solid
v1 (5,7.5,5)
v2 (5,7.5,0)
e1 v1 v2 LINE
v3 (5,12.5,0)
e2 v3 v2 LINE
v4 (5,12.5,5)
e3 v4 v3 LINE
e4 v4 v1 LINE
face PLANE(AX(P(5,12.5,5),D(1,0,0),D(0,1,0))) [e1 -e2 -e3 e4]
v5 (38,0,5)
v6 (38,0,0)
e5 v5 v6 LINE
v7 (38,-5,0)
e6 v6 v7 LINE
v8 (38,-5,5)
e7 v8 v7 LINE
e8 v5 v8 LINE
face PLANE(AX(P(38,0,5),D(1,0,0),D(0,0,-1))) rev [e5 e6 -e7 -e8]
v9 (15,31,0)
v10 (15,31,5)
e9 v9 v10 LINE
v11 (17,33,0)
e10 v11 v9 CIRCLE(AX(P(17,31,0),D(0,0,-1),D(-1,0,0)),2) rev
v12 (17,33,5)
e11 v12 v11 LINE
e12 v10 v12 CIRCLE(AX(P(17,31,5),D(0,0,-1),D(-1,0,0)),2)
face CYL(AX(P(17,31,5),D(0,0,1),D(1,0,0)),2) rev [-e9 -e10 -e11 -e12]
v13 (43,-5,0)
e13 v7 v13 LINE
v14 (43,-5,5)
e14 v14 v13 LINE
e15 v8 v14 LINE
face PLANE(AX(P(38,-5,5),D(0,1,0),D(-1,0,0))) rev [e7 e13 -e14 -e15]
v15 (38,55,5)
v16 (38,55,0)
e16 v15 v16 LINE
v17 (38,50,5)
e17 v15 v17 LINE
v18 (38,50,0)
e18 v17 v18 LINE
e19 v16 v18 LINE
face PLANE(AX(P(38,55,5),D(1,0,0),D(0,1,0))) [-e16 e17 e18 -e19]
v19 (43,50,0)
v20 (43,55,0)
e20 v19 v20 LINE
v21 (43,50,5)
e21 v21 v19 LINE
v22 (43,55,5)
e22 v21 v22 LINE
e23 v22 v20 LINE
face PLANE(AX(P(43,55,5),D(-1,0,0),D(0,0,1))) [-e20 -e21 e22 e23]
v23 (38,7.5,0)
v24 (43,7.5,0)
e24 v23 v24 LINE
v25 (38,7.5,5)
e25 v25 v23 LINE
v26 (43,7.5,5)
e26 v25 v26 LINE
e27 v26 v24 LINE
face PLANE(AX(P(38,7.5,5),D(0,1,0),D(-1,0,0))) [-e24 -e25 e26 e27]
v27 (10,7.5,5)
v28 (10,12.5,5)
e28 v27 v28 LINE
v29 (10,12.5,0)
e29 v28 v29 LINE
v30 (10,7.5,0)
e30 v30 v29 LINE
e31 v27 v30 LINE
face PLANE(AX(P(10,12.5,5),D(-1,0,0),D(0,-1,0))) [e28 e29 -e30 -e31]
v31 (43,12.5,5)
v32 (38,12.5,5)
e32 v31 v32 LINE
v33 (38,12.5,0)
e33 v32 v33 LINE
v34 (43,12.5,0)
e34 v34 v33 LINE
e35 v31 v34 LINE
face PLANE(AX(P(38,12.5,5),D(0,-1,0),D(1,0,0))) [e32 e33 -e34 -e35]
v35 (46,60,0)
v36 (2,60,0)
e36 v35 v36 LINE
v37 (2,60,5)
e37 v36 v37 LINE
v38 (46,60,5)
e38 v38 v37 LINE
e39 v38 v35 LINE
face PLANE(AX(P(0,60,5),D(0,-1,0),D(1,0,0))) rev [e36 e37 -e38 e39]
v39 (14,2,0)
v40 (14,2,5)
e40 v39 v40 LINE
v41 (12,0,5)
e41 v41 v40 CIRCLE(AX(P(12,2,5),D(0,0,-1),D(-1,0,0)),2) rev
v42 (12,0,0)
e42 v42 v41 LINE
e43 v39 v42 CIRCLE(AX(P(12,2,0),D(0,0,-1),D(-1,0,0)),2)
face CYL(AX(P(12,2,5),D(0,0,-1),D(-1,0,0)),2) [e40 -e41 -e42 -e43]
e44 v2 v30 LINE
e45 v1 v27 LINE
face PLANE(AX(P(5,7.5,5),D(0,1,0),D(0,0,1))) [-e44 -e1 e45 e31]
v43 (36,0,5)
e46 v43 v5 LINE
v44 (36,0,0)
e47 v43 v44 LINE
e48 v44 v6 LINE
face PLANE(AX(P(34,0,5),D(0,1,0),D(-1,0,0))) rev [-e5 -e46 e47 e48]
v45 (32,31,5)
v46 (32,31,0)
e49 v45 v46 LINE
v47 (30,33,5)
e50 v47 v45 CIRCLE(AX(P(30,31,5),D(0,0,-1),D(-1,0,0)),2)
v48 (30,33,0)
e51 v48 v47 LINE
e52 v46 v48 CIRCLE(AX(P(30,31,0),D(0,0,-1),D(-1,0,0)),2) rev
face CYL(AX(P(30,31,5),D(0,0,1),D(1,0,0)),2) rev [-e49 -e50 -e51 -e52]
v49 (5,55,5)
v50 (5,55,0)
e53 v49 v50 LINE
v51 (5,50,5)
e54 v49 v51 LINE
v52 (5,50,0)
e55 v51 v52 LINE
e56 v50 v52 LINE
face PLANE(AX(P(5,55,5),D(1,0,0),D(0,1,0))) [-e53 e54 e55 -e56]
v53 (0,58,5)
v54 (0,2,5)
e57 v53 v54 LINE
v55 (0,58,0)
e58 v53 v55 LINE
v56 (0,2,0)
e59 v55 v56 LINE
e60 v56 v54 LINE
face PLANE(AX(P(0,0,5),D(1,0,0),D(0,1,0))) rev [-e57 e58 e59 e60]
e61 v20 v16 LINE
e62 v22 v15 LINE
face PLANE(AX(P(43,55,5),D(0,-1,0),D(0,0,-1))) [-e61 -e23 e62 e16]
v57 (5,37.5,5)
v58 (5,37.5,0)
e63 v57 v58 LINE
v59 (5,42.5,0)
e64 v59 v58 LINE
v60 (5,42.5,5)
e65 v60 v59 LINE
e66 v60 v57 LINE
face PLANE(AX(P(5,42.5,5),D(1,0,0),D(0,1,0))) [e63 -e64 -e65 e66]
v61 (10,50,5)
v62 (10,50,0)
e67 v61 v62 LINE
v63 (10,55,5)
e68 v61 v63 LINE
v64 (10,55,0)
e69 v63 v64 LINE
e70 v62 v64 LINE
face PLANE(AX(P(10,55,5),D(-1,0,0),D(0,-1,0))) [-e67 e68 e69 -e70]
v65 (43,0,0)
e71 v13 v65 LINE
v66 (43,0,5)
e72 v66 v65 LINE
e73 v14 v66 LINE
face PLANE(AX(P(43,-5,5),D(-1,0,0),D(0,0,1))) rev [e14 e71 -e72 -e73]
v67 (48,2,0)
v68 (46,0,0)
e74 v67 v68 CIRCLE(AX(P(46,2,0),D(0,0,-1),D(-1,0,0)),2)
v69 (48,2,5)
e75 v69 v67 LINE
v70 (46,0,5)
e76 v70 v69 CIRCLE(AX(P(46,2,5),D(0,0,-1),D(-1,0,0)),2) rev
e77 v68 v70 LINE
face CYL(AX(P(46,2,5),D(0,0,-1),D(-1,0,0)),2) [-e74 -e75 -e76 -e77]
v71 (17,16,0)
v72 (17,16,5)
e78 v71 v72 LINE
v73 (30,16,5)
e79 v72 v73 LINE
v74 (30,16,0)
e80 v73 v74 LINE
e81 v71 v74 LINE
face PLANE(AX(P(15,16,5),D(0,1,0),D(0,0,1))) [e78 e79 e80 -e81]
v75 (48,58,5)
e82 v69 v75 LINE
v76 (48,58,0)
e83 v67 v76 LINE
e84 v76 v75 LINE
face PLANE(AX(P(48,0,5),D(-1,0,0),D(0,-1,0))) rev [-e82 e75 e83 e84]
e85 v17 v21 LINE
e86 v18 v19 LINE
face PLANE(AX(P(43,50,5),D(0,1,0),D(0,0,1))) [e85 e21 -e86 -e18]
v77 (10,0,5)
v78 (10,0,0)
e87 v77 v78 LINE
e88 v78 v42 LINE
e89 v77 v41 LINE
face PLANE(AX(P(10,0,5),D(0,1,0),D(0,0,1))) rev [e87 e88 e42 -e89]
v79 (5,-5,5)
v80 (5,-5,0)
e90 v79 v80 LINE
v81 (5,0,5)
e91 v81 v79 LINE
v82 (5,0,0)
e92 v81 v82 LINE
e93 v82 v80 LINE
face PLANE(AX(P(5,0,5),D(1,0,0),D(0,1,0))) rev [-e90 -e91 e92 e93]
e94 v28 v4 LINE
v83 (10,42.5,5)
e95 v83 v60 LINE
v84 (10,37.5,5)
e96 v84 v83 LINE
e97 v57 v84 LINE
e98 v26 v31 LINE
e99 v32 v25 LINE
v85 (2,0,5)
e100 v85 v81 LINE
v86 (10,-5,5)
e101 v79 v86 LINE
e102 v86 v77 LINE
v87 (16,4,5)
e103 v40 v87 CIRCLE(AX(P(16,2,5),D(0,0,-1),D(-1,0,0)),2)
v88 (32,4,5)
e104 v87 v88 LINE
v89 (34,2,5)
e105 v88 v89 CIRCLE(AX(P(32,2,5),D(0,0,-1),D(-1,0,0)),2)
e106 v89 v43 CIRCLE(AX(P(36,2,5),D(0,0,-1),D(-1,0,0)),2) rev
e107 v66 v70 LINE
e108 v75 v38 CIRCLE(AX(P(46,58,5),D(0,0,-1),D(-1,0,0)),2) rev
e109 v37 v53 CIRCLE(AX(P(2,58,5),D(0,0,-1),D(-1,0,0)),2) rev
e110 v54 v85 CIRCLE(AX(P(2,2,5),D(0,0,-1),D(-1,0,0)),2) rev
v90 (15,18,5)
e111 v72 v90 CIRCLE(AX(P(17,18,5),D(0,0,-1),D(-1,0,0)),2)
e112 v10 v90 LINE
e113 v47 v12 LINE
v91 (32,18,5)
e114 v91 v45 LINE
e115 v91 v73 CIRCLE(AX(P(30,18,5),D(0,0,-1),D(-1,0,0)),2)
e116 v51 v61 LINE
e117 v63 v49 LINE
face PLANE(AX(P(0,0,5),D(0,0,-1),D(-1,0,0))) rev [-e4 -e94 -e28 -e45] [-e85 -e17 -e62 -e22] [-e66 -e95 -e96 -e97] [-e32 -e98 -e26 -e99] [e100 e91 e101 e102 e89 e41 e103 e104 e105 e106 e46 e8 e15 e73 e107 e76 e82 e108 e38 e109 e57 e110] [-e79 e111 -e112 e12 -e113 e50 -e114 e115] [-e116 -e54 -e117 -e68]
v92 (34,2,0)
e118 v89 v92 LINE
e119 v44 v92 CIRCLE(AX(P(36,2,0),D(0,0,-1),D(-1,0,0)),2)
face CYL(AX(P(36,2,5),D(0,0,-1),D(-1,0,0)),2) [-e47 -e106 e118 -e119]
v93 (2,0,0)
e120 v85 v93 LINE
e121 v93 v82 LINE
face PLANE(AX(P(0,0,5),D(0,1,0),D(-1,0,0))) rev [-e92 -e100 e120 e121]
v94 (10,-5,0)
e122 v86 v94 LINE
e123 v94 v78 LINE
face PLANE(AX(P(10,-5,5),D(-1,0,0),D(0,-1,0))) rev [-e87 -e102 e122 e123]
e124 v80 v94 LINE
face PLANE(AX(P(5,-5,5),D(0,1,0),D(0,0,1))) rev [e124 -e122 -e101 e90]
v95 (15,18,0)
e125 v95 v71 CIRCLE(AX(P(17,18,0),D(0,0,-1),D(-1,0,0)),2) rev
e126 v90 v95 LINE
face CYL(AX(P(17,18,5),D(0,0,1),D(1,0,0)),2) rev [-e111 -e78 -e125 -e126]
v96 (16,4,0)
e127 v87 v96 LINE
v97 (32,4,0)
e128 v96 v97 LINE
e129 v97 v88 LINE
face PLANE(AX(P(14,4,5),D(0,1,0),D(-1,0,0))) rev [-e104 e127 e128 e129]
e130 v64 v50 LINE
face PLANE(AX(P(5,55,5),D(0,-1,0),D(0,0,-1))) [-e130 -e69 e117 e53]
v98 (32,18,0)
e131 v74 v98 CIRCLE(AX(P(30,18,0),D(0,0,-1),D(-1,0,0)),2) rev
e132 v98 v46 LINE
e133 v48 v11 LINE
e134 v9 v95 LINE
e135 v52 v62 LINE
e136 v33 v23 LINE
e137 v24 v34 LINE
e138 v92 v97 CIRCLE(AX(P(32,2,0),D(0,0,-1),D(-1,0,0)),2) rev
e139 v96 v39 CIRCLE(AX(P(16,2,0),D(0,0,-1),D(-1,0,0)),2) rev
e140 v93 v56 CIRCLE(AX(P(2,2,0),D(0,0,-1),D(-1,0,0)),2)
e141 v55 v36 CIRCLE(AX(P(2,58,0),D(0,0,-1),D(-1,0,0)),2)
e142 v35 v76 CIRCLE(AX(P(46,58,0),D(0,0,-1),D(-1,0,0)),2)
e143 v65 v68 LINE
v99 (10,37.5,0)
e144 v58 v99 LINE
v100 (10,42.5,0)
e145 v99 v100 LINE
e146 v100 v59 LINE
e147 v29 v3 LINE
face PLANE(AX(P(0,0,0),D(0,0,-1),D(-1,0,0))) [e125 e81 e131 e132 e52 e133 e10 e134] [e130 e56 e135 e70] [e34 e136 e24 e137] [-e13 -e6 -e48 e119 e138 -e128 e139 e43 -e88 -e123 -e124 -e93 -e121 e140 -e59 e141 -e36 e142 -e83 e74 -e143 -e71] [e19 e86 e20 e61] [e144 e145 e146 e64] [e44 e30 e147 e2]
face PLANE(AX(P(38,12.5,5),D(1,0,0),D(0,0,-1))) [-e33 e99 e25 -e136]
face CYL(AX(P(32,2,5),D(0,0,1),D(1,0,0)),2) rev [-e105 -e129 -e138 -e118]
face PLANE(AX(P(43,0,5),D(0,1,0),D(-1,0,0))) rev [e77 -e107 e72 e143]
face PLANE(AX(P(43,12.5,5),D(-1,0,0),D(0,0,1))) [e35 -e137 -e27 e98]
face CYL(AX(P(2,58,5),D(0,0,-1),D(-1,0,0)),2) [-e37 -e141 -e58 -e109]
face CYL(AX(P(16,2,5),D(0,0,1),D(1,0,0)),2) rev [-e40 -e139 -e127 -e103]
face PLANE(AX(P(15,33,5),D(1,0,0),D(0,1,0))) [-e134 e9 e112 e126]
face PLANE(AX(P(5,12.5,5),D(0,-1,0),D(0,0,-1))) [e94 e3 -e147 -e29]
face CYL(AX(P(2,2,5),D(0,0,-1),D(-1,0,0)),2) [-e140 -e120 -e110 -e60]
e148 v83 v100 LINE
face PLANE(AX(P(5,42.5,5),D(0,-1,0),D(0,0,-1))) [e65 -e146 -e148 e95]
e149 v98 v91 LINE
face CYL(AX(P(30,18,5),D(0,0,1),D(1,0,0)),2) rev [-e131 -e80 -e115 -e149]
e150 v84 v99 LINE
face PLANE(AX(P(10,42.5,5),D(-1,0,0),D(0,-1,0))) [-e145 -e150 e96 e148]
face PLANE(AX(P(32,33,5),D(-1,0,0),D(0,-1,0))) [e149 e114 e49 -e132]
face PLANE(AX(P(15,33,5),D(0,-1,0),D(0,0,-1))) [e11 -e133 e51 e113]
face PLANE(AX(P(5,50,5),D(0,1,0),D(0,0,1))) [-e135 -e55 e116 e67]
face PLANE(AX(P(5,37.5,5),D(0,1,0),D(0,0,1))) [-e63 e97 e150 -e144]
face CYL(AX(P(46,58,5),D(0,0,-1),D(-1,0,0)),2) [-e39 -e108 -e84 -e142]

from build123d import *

# Parameters (mm, degrees)
ESQUISSE1_W        = 5
ESQUISSE1_H        = 5
ESQUISSE1_W_2      = 17
ESQUISSE1_H_2      = 17
BOSS_EXTRU_1_DEPTH = 5
CONG_1_START       = -1
CONG_1_DEPTH       = 7
CONG_1_2_DEPTH     = 5


with BuildPart() as part:
    # Esquisse1 → Boss.-Extru.1 (new body)
    with BuildSketch(Plane.XY):
        Polygon((0, 0), (5, 0), (5, -5), (10, -5), (10, 0), (14, 0), (14, 4), (34, 4), (34, 0), (38, 0), (38, -5), (43, -5), (43, 0), (48, 0), (48, 60), (0, 60), align=None)
        with Locations((7.5, 10)):
            Rectangle(ESQUISSE1_W, ESQUISSE1_H, mode=Mode.SUBTRACT)
        with Locations((7.5, 40)):
            Rectangle(ESQUISSE1_W, ESQUISSE1_H, mode=Mode.SUBTRACT)
        with Locations((40.5, 10)):
            Rectangle(ESQUISSE1_W, ESQUISSE1_H, mode=Mode.SUBTRACT)
        with Locations((40.5, 52.5)):
            Rectangle(ESQUISSE1_W, ESQUISSE1_H, mode=Mode.SUBTRACT)
        with Locations((7.5, 52.5)):
            Rectangle(ESQUISSE1_W, ESQUISSE1_H, mode=Mode.SUBTRACT)
        with Locations((23.5, 24.5)):
            Rectangle(ESQUISSE1_W_2, ESQUISSE1_H_2, mode=Mode.SUBTRACT)
    extrude(amount=BOSS_EXTRU_1_DEPTH)

    # Congé1: read off the stored shape, not the designer's step
    # Congé1 outline → Congé1 (cut)
    with BuildSketch(Plane.XY.offset(CONG_1_START)):
        with BuildLine():
            Line((14, 0), (14, 2))
            ThreePointArc((14, 2), (13.414213562, 0.585786438), (12, 0))
            Line((12, 0), (14, 0))
        make_face()
        with BuildLine():
            ThreePointArc((36, 0), (34.585786438, 0.585786438), (34, 2))
            Line((34, 2), (34, 0))
            Line((34, 0), (36, 0))
        make_face()
        with BuildLine():
            Line((48, 0), (48, 2))
            ThreePointArc((48, 2), (47.414213562, 0.585786438), (46, 0))
            Line((46, 0), (48, 0))
        make_face()
        with BuildLine():
            ThreePointArc((2, 0), (0.585786438, 0.585786438), (0, 2))
            Line((0, 2), (0, 0))
            Line((0, 0), (2, 0))
        make_face()
        with BuildLine():
            ThreePointArc((0, 58), (0.585786438, 59.414213562), (2, 60))
            Line((2, 60), (0, 60))
            Line((0, 60), (0, 58))
        make_face()
        with BuildLine():
            ThreePointArc((46, 60), (47.414213562, 59.414213562), (48, 58))
            Line((48, 58), (48, 60))
            Line((48, 60), (46, 60))
        make_face()
    extrude(amount=CONG_1_DEPTH, mode=Mode.SUBTRACT)

    # Cong_1 2 outline → Cong_1 2 (add)
    with BuildSketch(Plane.XY):
        with BuildLine():
            ThreePointArc((30, 33), (31.414213562, 32.414213562), (32, 31))
            Line((32, 31), (32, 33))
            Line((32, 33), (30, 33))
        make_face()
        with BuildLine():
            Line((32, 16), (32, 18))
            ThreePointArc((32, 18), (31.414213562, 16.585786438), (30, 16))
            Line((30, 16), (32, 16))
        make_face()
        with BuildLine():
            ThreePointArc((15, 31), (15.585786438, 32.414213562), (17, 33))
            Line((17, 33), (15, 33))
            Line((15, 33), (15, 31))
        make_face()
        with BuildLine():
            Line((15, 16), (17, 16))
            ThreePointArc((17, 16), (15.585786438, 16.585786438), (15, 18))
            Line((15, 18), (15, 16))
        make_face()
        with BuildLine():
            Line((34, 4), (32, 4))
            ThreePointArc((32, 4), (33.414213562, 3.414213562), (34, 2))
            Line((34, 2), (34, 4))
        make_face()
        with BuildLine():
            ThreePointArc((14, 2), (14.585786438, 3.414213562), (16, 4))
            Line((16, 4), (14, 4))
            Line((14, 4), (14, 2))
        make_face()
    extrude(amount=CONG_1_2_DEPTH)


solid = part.part
